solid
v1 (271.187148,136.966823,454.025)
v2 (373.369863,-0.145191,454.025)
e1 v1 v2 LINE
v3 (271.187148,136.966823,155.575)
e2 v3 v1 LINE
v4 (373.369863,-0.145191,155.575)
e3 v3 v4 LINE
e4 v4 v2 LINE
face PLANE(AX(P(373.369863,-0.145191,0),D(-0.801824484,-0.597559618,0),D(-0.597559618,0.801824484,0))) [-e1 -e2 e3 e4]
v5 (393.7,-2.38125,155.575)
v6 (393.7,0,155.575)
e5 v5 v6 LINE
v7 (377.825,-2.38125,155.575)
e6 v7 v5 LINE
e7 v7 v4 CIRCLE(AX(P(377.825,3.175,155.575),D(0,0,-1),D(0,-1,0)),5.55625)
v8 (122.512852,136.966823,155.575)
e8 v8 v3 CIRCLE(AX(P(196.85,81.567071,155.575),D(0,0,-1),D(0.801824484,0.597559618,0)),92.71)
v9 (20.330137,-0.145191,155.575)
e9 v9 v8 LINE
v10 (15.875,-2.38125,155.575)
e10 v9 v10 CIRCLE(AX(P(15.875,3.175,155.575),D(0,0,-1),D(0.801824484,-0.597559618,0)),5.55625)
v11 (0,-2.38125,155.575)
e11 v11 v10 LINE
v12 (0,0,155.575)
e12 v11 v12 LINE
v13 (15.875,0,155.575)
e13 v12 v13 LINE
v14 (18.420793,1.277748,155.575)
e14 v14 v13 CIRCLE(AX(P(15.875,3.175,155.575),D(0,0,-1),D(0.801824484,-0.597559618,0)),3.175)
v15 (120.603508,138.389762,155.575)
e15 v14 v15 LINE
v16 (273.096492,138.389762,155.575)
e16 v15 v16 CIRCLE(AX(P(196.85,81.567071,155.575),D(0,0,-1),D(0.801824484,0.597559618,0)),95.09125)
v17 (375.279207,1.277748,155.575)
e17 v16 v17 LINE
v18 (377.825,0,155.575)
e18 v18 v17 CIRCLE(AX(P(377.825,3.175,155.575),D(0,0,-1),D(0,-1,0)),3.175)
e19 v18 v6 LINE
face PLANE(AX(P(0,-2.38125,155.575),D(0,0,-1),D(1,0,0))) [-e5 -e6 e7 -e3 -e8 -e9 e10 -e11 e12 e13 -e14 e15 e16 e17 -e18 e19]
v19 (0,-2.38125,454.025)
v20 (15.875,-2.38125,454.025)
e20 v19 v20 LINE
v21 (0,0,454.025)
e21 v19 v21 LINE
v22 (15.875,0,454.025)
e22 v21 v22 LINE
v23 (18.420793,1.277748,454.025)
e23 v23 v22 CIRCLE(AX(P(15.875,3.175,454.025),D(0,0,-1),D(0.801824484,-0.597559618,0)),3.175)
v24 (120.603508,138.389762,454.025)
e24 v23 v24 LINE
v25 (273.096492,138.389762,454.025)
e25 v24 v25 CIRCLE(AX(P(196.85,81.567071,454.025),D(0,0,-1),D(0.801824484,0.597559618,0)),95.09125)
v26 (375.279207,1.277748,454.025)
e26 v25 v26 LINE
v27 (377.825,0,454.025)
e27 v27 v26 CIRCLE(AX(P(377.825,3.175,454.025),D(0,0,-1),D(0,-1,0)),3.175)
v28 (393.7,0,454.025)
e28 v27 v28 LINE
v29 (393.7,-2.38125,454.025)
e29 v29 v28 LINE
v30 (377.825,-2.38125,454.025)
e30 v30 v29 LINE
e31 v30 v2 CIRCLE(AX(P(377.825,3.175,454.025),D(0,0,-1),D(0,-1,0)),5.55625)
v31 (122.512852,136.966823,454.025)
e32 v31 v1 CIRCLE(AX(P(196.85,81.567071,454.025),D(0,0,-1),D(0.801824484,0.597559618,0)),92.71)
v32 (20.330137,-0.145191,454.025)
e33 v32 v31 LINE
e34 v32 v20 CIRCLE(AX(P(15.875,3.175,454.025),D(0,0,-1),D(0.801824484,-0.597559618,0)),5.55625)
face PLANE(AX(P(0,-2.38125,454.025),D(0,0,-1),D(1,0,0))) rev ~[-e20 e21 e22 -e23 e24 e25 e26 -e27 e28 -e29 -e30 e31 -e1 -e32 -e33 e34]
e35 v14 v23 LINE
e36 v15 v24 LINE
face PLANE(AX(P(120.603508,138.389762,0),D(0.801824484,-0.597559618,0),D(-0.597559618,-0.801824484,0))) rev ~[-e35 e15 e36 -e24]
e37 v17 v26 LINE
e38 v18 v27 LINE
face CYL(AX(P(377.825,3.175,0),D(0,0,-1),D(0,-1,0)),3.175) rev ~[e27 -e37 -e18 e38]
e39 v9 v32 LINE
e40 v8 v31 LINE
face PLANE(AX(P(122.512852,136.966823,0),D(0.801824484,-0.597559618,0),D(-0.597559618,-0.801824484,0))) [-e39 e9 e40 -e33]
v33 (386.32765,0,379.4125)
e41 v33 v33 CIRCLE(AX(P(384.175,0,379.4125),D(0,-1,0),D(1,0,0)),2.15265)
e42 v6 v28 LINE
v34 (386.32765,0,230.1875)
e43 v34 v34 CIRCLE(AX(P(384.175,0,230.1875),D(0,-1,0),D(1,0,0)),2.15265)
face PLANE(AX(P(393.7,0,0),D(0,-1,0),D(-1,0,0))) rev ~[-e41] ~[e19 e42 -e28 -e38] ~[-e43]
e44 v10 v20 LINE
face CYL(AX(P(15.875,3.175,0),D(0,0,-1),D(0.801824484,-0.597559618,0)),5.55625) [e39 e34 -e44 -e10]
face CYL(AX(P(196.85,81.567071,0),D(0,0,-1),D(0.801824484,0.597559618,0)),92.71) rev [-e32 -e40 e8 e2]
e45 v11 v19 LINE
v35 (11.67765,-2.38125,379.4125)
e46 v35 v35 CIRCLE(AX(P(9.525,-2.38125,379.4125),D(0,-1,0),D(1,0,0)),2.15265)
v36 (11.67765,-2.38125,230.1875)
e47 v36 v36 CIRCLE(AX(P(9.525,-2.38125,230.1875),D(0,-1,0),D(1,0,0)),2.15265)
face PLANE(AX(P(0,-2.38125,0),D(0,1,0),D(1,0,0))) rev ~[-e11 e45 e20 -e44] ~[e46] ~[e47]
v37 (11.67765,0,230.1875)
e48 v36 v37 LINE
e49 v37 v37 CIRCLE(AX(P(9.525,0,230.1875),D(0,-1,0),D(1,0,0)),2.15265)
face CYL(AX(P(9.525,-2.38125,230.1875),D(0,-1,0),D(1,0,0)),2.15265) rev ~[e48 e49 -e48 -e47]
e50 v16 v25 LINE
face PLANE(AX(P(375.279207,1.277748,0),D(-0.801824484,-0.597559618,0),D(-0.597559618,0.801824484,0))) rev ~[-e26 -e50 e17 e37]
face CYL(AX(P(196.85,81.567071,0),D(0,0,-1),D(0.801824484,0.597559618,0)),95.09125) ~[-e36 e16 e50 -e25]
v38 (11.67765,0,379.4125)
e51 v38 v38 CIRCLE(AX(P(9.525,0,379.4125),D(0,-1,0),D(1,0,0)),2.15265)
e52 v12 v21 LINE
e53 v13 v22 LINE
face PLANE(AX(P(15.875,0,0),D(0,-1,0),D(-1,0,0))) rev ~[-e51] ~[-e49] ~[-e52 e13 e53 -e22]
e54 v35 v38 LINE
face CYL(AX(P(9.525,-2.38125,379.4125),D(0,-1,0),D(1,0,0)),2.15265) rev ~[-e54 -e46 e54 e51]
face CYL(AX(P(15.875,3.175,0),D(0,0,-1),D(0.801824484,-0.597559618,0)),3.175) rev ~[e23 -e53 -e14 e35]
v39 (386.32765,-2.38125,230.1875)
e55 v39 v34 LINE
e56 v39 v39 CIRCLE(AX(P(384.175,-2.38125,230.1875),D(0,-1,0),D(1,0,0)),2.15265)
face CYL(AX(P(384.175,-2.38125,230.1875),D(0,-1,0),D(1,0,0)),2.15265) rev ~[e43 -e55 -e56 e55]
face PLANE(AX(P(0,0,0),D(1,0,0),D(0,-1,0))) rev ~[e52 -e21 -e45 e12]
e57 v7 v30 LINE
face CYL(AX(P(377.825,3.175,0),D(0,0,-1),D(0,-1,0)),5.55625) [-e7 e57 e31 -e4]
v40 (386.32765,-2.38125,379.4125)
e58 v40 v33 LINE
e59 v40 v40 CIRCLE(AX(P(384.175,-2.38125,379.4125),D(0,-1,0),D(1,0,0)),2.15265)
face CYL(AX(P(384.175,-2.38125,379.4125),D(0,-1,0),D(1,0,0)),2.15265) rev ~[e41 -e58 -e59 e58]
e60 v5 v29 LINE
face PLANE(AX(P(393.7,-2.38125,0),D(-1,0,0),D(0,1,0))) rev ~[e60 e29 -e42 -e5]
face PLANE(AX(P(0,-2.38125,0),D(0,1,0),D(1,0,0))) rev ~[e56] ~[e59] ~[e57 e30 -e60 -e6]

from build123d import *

# Parameters (mm, degrees)
F1_DEPTH = 609.6
F2_T     = 2.38125
F3_W     = 393.7
F3_H     = 155.575
F4_DEPTH = 179.0405708
F5_R     = 2.15265
F6_DEPTH = 2.38125


# Not quite as in the source:
# - a shell that OpenCascade refuses in one call is made with other operations: the cavity is built on its own and cut out


with BuildPart() as f1:
    # F0 (on Top) → F1 (new body)
    with BuildSketch(Plane.XY):
        with BuildLine():
            Line((15.875, 0), (0, 0))
            Line((0, 0), (0, -2.38125))
            Line((0, -2.38125), (393.7, -2.38125))
            Line((393.7, -2.38125), (393.7, 0))
            Line((393.7, 0), (377.825, 0))
            ThreePointArc((377.825, 0), (376.4007720387, 0.337360186), (375.2792072647, 1.2777482116))
            Line((375.2792072647, 1.2777482116), (273.096492423, 138.389761864))
            ThreePointArc((273.096492423, 138.389761864), (196.85, 176.6583208), (120.603507577, 138.389761864))
            Line((120.603507577, 138.389761864), (18.4207927353, 1.2777482116))
            ThreePointArc((18.4207927353, 1.2777482116), (17.2992279613, 0.337360186), (15.875, 0))
        make_face()
    extrude(amount=F1_DEPTH)

    # F2: shell of thickness 2.38125, made by hand


with BuildPart() as f2_core1:
    # F2_t2: copy of F1
    add(f1.part)

    # the walls: a layer under each face that stays
    f2_faces = [f2_core1.faces().sort_by_distance(p)[0] for p in [
        (196.85, 176.6583208, 304.8),
        (69.5121501562, 69.8337550378, 304.8),
        (17.2992279613, 0.337360186, 304.8),
        (7.9375, 0, 304.8),
        (0, -1.190625, 304.8),
        (393.7, -1.190625, 304.8),
        (385.7625, 0, 304.8),
        (376.4007720387, 0.337360186, 304.8),
        (324.1878498438, 69.8337550378, 304.8),
        (196.85, 87.1385354, 0),
        (196.85, 87.1385354, 609.6),
    ]]
    thicken(f2_faces, amount=-F2_T, mode=Mode.SUBTRACT)


with BuildPart() as f1_1:
    add(f1.part)

    # what is left inside the walls is the cavity
    f2_cavity = [f2_core1.part.solids().sort_by_distance(p)[0] for p in [
        (196.85, -2.357438, 405.60625),
    ]]
    add(f2_cavity, mode=Mode.SUBTRACT)

    # F3 (on face) → F4 (cut, through all)
    with BuildSketch(Plane.XZ.offset(2.38125)):
        with Locations((196.85, 531.8125)):
            Rectangle(F3_W, F3_H)
        with Locations((196.85, 77.7875)):
            Rectangle(F3_W, F3_H)
    extrude(amount=-F4_DEPTH, mode=Mode.SUBTRACT)

    # F5 (on face) → F6 (cut, through all)
    with BuildSketch(Plane.XZ.offset(2.38125)):
        with Locations((384.175, 230.1875)):
            Circle(F5_R)
        with Locations((384.175, 379.4125)):
            Circle(F5_R)
        with Locations((9.525, 379.4125)):
            Circle(F5_R)
        with Locations((9.525, 230.1875)):
            Circle(F5_R)
    extrude(amount=-F6_DEPTH, mode=Mode.SUBTRACT)


solid = f1_1.part
